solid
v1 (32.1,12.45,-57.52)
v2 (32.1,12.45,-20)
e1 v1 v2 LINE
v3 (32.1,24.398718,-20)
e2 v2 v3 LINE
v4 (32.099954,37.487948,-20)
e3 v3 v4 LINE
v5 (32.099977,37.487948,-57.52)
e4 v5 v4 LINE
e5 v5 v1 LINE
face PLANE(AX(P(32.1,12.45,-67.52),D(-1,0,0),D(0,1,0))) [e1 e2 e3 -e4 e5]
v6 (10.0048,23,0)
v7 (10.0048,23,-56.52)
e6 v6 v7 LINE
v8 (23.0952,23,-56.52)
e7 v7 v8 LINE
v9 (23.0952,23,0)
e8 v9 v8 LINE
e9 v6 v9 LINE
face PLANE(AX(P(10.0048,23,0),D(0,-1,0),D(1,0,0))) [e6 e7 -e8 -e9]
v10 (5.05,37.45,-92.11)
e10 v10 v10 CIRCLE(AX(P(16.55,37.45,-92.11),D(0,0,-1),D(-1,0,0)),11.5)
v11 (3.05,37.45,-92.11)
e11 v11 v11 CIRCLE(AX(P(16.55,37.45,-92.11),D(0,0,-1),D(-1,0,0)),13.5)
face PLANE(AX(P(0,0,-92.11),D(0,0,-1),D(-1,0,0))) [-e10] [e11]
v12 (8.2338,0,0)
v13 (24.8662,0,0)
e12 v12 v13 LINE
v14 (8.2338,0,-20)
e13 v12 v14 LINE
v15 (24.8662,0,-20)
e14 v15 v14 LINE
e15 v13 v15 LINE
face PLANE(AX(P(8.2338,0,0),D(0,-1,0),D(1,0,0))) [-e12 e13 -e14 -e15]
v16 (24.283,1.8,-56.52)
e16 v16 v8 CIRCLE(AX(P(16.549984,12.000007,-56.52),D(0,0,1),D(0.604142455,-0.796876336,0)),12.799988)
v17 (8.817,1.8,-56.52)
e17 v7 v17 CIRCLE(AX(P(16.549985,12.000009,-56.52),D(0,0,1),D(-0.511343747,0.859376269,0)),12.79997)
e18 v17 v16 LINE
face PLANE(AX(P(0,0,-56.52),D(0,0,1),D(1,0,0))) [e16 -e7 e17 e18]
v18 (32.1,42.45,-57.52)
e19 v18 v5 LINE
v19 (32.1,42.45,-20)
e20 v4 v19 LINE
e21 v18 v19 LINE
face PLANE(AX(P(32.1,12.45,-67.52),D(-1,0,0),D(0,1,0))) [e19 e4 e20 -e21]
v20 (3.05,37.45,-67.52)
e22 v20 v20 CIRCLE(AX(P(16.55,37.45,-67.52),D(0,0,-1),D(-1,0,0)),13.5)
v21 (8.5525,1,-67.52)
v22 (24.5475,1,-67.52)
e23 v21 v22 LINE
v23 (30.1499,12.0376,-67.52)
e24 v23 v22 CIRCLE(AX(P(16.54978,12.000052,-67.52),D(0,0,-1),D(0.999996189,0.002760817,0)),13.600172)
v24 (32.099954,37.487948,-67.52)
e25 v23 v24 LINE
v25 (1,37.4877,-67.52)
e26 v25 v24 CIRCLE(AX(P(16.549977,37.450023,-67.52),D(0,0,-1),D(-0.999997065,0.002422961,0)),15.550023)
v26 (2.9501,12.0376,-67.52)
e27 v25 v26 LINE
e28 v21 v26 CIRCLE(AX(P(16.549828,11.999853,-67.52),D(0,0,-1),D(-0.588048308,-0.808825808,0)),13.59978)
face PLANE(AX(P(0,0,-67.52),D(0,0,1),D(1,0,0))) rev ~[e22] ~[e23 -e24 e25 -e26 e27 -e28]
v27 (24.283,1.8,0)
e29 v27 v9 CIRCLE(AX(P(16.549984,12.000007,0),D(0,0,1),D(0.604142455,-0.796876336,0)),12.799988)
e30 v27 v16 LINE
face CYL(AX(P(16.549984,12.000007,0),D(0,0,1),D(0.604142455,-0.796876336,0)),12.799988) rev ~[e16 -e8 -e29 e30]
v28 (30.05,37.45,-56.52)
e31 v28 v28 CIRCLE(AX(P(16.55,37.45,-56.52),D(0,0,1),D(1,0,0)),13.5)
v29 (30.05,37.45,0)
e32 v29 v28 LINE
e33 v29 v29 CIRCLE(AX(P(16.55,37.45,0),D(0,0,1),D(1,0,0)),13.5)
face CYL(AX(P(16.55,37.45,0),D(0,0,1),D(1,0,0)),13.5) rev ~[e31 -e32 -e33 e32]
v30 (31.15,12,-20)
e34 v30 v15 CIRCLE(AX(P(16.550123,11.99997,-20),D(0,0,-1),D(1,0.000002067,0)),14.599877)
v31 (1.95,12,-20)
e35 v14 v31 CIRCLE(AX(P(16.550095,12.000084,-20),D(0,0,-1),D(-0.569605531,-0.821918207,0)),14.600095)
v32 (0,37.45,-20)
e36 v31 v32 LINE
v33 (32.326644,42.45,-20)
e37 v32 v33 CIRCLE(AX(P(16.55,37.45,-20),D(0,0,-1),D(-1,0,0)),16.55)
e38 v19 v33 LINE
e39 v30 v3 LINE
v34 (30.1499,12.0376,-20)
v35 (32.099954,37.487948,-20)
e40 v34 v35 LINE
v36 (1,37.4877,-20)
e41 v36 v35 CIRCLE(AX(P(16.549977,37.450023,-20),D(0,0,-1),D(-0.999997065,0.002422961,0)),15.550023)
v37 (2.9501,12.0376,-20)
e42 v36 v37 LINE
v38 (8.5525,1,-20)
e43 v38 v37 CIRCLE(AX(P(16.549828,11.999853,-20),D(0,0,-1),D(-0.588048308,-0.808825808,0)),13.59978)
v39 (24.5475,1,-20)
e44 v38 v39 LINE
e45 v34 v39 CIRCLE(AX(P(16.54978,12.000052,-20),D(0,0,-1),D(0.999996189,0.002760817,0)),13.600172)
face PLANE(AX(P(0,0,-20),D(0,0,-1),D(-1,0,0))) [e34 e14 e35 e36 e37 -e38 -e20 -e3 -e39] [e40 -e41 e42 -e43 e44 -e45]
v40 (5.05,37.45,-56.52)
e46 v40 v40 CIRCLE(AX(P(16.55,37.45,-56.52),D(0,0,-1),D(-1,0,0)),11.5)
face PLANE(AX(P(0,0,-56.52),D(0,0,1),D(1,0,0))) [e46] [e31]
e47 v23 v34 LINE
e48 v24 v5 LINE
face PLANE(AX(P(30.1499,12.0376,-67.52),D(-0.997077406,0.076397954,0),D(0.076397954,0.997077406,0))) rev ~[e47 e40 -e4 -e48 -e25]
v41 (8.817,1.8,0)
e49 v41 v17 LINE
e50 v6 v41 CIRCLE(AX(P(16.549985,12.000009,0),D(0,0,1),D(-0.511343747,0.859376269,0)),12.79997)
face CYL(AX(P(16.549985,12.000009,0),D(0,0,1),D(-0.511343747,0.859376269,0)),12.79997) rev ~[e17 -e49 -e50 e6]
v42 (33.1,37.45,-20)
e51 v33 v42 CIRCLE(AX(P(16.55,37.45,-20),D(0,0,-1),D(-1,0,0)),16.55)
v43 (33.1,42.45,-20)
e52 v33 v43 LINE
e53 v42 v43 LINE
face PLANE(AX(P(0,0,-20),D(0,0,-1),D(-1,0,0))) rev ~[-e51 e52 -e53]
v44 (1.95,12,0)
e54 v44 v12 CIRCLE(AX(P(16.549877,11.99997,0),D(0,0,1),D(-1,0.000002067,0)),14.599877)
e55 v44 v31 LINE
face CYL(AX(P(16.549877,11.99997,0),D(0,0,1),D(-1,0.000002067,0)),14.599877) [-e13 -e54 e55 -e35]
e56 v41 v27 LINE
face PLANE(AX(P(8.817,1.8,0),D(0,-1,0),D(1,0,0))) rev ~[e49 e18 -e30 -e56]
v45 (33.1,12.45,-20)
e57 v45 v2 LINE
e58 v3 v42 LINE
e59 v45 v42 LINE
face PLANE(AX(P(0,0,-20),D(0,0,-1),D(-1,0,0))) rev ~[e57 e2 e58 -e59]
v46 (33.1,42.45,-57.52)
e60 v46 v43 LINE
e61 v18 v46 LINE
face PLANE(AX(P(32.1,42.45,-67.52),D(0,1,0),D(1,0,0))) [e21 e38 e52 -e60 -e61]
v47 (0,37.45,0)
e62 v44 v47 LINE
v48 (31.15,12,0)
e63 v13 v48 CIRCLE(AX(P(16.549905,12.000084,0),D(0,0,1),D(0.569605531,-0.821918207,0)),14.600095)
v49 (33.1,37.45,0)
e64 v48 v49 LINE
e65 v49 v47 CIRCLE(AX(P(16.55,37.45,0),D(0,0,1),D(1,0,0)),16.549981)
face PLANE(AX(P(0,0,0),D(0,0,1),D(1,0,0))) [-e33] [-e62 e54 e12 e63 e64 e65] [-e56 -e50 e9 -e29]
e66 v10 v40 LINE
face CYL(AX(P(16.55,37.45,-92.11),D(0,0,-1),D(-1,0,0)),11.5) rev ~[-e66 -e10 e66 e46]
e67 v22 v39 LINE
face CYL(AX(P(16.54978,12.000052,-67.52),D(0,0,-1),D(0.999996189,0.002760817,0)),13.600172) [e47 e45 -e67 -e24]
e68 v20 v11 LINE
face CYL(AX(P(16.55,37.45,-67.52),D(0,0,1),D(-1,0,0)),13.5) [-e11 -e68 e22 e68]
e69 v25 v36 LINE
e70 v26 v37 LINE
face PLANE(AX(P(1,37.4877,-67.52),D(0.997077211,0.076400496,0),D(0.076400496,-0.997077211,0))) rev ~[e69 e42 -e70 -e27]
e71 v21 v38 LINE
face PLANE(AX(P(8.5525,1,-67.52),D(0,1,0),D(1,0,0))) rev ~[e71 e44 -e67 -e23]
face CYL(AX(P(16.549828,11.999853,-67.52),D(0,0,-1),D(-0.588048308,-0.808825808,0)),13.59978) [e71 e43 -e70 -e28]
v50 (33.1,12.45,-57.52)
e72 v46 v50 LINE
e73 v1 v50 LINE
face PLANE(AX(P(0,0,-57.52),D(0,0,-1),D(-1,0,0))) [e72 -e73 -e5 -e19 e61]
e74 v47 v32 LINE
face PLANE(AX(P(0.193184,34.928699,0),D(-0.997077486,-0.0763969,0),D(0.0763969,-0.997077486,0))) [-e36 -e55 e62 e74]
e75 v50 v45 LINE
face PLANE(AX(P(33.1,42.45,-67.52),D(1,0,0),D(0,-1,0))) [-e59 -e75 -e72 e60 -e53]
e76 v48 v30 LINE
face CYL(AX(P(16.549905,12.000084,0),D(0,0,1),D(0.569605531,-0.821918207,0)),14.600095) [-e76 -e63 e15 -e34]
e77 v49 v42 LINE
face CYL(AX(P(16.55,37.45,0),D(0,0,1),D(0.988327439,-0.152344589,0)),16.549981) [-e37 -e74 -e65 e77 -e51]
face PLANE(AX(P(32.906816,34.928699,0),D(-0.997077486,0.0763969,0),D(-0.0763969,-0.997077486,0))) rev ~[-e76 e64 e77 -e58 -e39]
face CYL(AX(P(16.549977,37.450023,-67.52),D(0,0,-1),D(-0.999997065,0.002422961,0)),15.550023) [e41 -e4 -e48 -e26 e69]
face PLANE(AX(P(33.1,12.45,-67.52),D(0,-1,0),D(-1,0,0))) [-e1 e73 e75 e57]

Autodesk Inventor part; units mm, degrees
ref_plane "YZ Plane" through (0, 0, 0) normal (1, 0, 0) x (0, 1, 0)
ref_plane "XZ Plane" through (0, 0, 0) normal (0, 1, 0) x (-1, 0, 0)
ref_plane "XY Plane" through (0, 0, 0) normal (0, 0, 1) x (1, 0, 0)
sketch "Sketch1" plane through (0, 0, 0) normal (0, 0, 1) x (1, 0, 0)
  line L0 (0, 0) -> (33.1, 0)
  line L1 (33.1, 0) -> (33.1, 54)
  line L2 (33.1, 54) -> (0, 54)
  line L3 (0, 54) -> (0, 0)
  arc A0 (32.9068, 34.9287) -> (0.1932, 34.9287) centre (16.55, 37.45) ccw
  line L4 (0, 37.45) -> (1.95, 12)
  line L5 (1.95, 12) -> (13.9851, 12) construction
  line L6 (8.2338, 0) -> (24.8662, 0)
  line L7 (33.1, 37.45) -> (31.15, 12)
  arc A1 (1.95, 12) -> (8.2338, 0) centre (16.55, 12) ccw
  arc A2 (24.8662, 0) -> (31.15, 12) centre (16.55, 12) ccw
  dimension "d0" = 33.1
  dimension "d1" = 54
  dimension "d2" = 33.1
extrude "Extrusion1" add sketch "Sketch1" against normal blind 67.52 contours A1 L4 A0 L7 A2 L0
sketch "Sketch3" plane through (0, 0, 0) normal (0, 0, 1) x (1, 0, 0)
  arc A0 (33.1, 37.45) -> (0, 37.45) centre (16.55, 37.45) ccw projected
  circle A1 centre (16.55, 37.45) radius 13.5
  arc A2 (24.8662, 0) -> (31.15, 12) centre (16.55, 12) ccw projected
  line L0 (8.817, 1.8) -> (24.283, 1.8)
  line L1 (8.817, 1.8) -> (24.283, 1.8) construction
  line L2 (10.0048, 23) -> (23.0952, 23)
  arc A3 (10.0048, 23) -> (8.817, 1.8) centre (16.55, 12) ccw
  arc A4 (24.283, 1.8) -> (23.0952, 23) centre (16.55, 12) ccw
  point P0 (0, 0)
  dimension "d7" = 27
extrude "Extrusion2" cut sketch "Sketch3" against normal blind 56.52
sketch "Sketch4" plane through (0, 0, -67.52) normal (0, 0, -1) x (-1, 0, 0)
  arc A0 (0, 37.45) -> (-33.1, 37.45) centre (-16.55, 37.45) ccw projected
  circle A1 centre (-16.55, 37.45) radius 13.5
  point P0 (0, 0)
extrude "Extrusion3" add sketch "Sketch4" along normal blind 24.59
sketch "Sketch7" plane through (0, 0, -67.52) normal (0, 0, -1) x (-1, 0, 0)
  circle A0 centre (-16.55, 37.45) radius 13.5 projected
  arc A1 (0, 37.45) -> (-33.1, 37.45) centre (-16.55, 37.45) ccw
  arc A2 (-23.0952, 23) -> (-24.283, 1.8) centre (-16.55, 12) ccw projected
  line L0 (-1.95, 12) -> (0, 37.45)
  line L1 (-24.8662, 0) -> (-8.2338, 0) projected
  line L2 (-24.8662, 0) -> (-8.2338, 0)
  arc A3 (-8.2338, 0) -> (-1.95, 12) centre (-16.55, 12) ccw
  arc A4 (-31.15, 12) -> (-24.8662, 0) centre (-16.55, 12) ccw
  arc A5 (-31.15, 12) -> (-24.8662, 0) centre (-16.55, 12) ccw projected
  line L3 (-31.15, 12) -> (-33.1, 37.45)
  arc A6 (-1, 37.4877) -> (-32.1, 37.45) centre (-16.55, 37.45) ccw
  line L4 (-1, 37.4877) -> (-2.9501, 12.0376)
  arc A7 (-8.5525, 1) -> (-2.9501, 12.0376) centre (-16.55, 12) ccw
  line L5 (-8.5525, 1) -> (-24.5475, 1)
  arc A8 (-30.1499, 12.0376) -> (-24.5475, 1) centre (-16.55, 12) ccw
  line L6 (-30.1499, 12.0376) -> (-32.1029, 37.5264)
  point P0 (0, 0)
  point P1 (-32.1, 37.4877)
  dimension "d21" = 1
extrude "Extrusion6" cut sketch "Sketch7" against normal blind 47.52 contours L0 A3 L1 A4 L3 A1
sketch "Sketch8" plane through (16.55, 37.45, -92.11) normal (0, 0, -1) x (-1, 0, 0)
  circle A0 centre (0, 0) radius 11.5
  point P0 (16.55, -37.45)
  dimension "d24" = 23
extrude "Extrusion7" cut sketch "Sketch8" against normal blind 44.77
sketch "Sketch11" plane through (0, 0, -67.52) normal (0, 0, -1) x (-1, 0, 0)
  arc A0 (0, 37.45) -> (-33.1, 37.45) centre (-16.55, 37.45) ccw projected
  line L0 (-33.1, 37.45) -> (-28.1, 37.45) construction
  line L1 (-33.1, 12.45) -> (-32.1, 12.45)
  line L2 (-32.1, 12.45) -> (-32.1, 42.45)
  line L3 (-32.1, 42.45) -> (-33.1, 42.45)
  line L4 (-33.1, 42.45) -> (-33.1, 12.45)
  point P0 (0, 0)
  dimension "d39" = 1
extrude "Extrusion9" add sketch "Sketch11" against normal blind 47.52
sketch "Sketch12" plane through (0, 0, -67.52) normal (0, 0, -1) x (-1, 0, 0)
  line L0 (-32.1, 12.45) -> (-33.1, 12.45) projected
  line L1 (-32.1, 42.45) -> (-32.1, 24.3987) projected
  line L2 (-33.1, 12.45) -> (-32.1, 12.45)
  line L3 (-32.1, 12.45) -> (-32.1, 42.45)
  line L4 (-32.1, 42.45) -> (-33.1, 42.45)
  line L5 (-33.1, 42.45) -> (-33.1, 12.45)
  point P0 (0, 0)
extrude "Extrusion10" cut sketch "Sketch12" against normal blind 10
properties part number "Big LRF Real"
